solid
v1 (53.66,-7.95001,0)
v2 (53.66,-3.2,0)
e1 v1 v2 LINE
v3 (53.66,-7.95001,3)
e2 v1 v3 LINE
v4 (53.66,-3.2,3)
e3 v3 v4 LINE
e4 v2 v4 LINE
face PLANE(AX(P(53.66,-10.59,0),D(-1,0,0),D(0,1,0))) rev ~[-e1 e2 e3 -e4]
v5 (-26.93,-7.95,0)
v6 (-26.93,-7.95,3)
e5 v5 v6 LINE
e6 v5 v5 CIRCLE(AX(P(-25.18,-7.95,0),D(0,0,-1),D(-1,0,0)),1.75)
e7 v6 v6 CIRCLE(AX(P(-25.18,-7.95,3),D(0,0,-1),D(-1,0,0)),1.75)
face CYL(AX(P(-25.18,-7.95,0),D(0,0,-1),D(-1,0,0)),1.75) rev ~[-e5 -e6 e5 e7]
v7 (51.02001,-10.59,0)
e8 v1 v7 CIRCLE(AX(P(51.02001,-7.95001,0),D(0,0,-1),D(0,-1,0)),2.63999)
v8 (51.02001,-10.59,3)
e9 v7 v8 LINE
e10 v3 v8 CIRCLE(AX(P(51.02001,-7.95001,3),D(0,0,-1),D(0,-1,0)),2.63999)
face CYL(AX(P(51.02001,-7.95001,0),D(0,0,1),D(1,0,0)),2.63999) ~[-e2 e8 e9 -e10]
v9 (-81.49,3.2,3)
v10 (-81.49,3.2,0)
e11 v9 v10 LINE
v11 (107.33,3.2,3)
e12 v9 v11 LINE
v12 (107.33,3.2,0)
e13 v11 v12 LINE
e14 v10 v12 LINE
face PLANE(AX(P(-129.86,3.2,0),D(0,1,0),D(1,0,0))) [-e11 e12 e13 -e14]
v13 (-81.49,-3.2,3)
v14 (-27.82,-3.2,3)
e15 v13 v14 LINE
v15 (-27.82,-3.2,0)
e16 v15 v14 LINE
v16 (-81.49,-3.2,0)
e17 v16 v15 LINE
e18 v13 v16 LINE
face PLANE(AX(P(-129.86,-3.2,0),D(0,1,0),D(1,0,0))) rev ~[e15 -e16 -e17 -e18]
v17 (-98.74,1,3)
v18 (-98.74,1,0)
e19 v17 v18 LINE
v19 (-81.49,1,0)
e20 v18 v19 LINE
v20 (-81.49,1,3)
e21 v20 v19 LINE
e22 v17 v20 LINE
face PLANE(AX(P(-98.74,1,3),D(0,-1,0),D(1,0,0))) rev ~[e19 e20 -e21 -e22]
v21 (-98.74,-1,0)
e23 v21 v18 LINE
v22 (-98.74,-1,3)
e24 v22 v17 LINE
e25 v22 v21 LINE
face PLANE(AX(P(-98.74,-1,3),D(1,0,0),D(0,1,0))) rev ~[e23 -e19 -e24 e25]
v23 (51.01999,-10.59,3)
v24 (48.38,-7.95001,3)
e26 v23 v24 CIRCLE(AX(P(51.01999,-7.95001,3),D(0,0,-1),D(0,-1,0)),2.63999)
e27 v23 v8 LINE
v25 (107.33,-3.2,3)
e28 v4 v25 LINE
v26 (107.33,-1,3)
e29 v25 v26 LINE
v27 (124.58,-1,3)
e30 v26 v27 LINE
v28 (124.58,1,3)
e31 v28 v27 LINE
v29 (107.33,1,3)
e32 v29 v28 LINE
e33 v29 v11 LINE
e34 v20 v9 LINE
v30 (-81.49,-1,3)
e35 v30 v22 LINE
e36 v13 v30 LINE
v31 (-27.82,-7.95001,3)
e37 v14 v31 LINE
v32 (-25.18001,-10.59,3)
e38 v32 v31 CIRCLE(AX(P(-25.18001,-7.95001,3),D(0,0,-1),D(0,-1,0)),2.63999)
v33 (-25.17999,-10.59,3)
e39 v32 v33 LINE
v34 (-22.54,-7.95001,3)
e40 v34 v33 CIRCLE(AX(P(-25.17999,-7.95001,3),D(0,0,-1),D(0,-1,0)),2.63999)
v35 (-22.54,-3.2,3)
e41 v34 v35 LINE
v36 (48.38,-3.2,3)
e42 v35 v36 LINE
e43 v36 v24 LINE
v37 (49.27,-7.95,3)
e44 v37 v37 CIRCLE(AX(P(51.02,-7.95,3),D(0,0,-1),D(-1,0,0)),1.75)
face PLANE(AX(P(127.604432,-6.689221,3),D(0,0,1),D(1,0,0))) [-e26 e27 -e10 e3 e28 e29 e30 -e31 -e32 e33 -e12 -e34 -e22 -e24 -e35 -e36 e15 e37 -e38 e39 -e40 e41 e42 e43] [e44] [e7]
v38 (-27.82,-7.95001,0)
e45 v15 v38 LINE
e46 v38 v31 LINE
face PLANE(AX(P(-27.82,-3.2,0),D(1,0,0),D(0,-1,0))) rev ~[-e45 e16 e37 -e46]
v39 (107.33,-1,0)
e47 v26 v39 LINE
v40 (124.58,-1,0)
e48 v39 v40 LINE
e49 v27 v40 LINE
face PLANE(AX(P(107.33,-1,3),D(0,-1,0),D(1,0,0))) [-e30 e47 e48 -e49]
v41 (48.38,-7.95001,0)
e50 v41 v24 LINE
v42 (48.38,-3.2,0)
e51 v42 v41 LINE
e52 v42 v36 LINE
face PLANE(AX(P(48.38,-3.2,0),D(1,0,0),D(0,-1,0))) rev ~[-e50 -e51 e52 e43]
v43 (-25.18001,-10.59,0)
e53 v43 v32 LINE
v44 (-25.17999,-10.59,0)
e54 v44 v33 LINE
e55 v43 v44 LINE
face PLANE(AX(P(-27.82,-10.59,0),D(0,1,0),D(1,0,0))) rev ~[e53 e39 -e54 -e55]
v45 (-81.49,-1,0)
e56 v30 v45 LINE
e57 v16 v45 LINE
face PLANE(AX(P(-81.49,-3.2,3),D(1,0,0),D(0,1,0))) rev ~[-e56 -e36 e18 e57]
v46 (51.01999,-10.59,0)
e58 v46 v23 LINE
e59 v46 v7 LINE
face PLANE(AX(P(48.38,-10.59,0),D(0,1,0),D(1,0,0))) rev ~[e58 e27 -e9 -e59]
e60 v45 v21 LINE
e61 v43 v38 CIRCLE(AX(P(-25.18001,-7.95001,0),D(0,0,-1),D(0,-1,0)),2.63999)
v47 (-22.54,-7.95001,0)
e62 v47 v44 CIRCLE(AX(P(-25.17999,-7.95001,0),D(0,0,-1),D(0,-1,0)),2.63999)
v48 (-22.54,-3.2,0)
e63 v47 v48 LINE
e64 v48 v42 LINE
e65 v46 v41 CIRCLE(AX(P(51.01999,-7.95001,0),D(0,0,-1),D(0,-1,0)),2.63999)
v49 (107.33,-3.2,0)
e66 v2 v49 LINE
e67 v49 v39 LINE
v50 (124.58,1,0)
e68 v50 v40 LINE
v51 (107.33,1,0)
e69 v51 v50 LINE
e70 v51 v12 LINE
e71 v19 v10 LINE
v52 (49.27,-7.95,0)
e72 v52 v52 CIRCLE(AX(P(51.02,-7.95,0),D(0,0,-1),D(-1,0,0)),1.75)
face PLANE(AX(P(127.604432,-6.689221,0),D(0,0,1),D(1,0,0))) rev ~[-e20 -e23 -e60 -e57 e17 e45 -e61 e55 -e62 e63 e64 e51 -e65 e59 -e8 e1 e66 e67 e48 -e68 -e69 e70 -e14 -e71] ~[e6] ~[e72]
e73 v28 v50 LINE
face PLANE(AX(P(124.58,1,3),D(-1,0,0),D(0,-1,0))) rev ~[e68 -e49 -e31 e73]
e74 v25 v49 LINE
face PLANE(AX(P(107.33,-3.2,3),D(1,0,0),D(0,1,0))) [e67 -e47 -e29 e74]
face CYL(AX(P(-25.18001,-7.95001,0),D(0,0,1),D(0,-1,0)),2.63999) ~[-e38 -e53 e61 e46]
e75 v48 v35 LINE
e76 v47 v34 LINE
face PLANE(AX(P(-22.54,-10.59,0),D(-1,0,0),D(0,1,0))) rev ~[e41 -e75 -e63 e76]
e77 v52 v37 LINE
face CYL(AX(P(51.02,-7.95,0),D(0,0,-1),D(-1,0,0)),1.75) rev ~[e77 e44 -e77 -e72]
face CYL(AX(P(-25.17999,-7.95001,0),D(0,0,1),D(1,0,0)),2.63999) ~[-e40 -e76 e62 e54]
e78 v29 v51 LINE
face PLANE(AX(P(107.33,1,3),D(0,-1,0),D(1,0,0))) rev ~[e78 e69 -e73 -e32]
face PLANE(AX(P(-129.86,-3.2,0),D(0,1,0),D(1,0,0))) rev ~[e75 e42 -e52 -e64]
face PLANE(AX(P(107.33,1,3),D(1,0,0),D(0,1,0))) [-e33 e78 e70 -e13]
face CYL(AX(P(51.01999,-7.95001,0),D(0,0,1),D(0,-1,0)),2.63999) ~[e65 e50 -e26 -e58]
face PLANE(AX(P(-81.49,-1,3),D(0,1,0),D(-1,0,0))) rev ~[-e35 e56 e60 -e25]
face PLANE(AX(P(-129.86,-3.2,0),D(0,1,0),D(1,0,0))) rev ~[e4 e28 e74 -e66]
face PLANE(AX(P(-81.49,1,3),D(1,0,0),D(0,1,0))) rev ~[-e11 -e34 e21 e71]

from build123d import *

# Parameters (mm, degrees)
F0_W     = 259.72
F0_H     = 6.4
F1_DEPTH = 3
F3_DEPTH = 3
F4_R     = 2.63999
F5_R     = 1.75
F5_W     = 17.25
F5_H     = 2.2
F6_DEPTH = 3.001
F7_W     = 31.12
F7_H     = 2
F8_DEPTH = 3.001


# Not quite as in the source:
# - a fillet or chamfer is up to 0.001 mm smaller than in the source, because OpenCascade refuses the exact size
# - ends of sketch curves that miss each other by under 0.0002 mm in the source are joined


with BuildPart() as f1:
    # F0 (on Top) → F1 (new body)
    with BuildSketch(Plane.XY):
        Rectangle(F0_W, F0_H)
    extrude(amount=F1_DEPTH)

    # F2 (on Top) → F3 (join)
    with BuildSketch(Plane.XY):
        with BuildLine():
            Line((129.86, -10.59), (129.86, -3.2))
            Line((129.86, -3.2), (124.58, -3.2))
            Line((124.58, -3.2), (124.58, -7.95))
            Line((124.58, -7.95), (125.47, -7.95))
            ThreePointArc((125.47, -7.95), (127.22, -6.2), (128.97, -7.95))
            ThreePointArc((128.97, -7.95), (128.4574368671, -9.1874368671), (127.22, -9.7))
            Line((127.22, -9.7), (127.22, -10.59))
            Line((127.22, -10.59), (129.86, -10.59))
        make_face()
        with BuildLine():
            Line((125.47, -7.95), (124.58, -7.95))
            Line((124.58, -7.95), (124.58, -10.59))
            Line((124.58, -10.59), (127.22, -10.59))
            Line((127.22, -10.59), (127.22, -9.7))
            ThreePointArc((127.22, -9.7), (125.9825631329, -9.1874368671), (125.47, -7.95))
        make_face()
        Polygon((53.66, -10.59), (53.66, -3.2), (48.38, -3.2), (48.38, -7.95), (48.38, -10.59), align=None)
        with BuildLine():
            ThreePointArc((52.77, -7.95), (51.02, -9.7), (49.27, -7.95))
            ThreePointArc((49.27, -7.95), (51.02, -6.2), (52.77, -7.95))
        make_face(mode=Mode.SUBTRACT)
        Polygon((-22.54, -3.2), (-27.82, -3.2), (-27.82, -7.95), (-27.82, -10.59), (-22.54, -10.59), align=None)
        with BuildLine():
            ThreePointArc((-23.43, -7.95), (-25.18, -9.7), (-26.93, -7.95))
            ThreePointArc((-26.93, -7.95), (-25.18, -6.2), (-23.43, -7.95))
        make_face(mode=Mode.SUBTRACT)
    extrude(amount=F3_DEPTH)

    # F4 (radius 2.64 in the source; OpenCascade refuses exactly that, so slightly less here)
    f4_edges = [f1.edges().sort_by_distance(p)[0] for p in [
        (48.38, -10.59, 1.5),
        (53.66, -10.59, 1.5),
        (124.58, -10.59, 1.5),
        (129.86, -10.59, 1.5),
        (-27.82, -10.59, 1.5),
        (-22.54, -10.59, 1.5),
    ]]
    fillet(f4_edges, radius=F4_R)

    # F5 (on face) → F6 (cut, through all)
    with BuildSketch(Plane.XY.offset(3)):
        with BuildLine():
            Line((124.58, 3.2), (124.58, 1))
            Line((124.58, 1), (124.58, -1))
            Line((124.58, -1), (124.58, -3.2))
            Line((124.58, -3.2), (124.58, -7.95001))
            ThreePointArc((124.58, -7.95001), (125.3532351687, -9.8167648313), (127.21999, -10.59))
            ThreePointArc((127.21999, -10.59), (129.0867648313, -9.8167648313), (129.86, -7.95001))
            Line((129.86, -7.95001), (129.86, 3.2))
            Line((129.86, 3.2), (124.58, 3.2))
        make_face()
        with Locations((127.22, -7.95)):
            Circle(F5_R, mode=Mode.SUBTRACT)
        with Locations((115.955, 2.1)):
            Rectangle(F5_W, F5_H)
        with Locations((115.955, -2.1)):
            Rectangle(F5_W, F5_H)
    extrude(amount=-F6_DEPTH, mode=Mode.SUBTRACT)

    # F7 (on face) → F8 (cut, through all)
    with BuildSketch(Plane.XY.offset(3)):
        Polygon((-129.86, 3.2), (-129.86, 1), (-98.74, 1), (-81.49, 1), (-81.49, 3.2), align=None)
        Polygon((-129.86, -1), (-129.86, -3.2), (-81.49, -3.2), (-81.49, -1), (-98.74, -1), align=None)
        with Locations((-114.3, 0)):
            Rectangle(F7_W, F7_H)
    extrude(amount=-F8_DEPTH, mode=Mode.SUBTRACT)


solid = f1.part
